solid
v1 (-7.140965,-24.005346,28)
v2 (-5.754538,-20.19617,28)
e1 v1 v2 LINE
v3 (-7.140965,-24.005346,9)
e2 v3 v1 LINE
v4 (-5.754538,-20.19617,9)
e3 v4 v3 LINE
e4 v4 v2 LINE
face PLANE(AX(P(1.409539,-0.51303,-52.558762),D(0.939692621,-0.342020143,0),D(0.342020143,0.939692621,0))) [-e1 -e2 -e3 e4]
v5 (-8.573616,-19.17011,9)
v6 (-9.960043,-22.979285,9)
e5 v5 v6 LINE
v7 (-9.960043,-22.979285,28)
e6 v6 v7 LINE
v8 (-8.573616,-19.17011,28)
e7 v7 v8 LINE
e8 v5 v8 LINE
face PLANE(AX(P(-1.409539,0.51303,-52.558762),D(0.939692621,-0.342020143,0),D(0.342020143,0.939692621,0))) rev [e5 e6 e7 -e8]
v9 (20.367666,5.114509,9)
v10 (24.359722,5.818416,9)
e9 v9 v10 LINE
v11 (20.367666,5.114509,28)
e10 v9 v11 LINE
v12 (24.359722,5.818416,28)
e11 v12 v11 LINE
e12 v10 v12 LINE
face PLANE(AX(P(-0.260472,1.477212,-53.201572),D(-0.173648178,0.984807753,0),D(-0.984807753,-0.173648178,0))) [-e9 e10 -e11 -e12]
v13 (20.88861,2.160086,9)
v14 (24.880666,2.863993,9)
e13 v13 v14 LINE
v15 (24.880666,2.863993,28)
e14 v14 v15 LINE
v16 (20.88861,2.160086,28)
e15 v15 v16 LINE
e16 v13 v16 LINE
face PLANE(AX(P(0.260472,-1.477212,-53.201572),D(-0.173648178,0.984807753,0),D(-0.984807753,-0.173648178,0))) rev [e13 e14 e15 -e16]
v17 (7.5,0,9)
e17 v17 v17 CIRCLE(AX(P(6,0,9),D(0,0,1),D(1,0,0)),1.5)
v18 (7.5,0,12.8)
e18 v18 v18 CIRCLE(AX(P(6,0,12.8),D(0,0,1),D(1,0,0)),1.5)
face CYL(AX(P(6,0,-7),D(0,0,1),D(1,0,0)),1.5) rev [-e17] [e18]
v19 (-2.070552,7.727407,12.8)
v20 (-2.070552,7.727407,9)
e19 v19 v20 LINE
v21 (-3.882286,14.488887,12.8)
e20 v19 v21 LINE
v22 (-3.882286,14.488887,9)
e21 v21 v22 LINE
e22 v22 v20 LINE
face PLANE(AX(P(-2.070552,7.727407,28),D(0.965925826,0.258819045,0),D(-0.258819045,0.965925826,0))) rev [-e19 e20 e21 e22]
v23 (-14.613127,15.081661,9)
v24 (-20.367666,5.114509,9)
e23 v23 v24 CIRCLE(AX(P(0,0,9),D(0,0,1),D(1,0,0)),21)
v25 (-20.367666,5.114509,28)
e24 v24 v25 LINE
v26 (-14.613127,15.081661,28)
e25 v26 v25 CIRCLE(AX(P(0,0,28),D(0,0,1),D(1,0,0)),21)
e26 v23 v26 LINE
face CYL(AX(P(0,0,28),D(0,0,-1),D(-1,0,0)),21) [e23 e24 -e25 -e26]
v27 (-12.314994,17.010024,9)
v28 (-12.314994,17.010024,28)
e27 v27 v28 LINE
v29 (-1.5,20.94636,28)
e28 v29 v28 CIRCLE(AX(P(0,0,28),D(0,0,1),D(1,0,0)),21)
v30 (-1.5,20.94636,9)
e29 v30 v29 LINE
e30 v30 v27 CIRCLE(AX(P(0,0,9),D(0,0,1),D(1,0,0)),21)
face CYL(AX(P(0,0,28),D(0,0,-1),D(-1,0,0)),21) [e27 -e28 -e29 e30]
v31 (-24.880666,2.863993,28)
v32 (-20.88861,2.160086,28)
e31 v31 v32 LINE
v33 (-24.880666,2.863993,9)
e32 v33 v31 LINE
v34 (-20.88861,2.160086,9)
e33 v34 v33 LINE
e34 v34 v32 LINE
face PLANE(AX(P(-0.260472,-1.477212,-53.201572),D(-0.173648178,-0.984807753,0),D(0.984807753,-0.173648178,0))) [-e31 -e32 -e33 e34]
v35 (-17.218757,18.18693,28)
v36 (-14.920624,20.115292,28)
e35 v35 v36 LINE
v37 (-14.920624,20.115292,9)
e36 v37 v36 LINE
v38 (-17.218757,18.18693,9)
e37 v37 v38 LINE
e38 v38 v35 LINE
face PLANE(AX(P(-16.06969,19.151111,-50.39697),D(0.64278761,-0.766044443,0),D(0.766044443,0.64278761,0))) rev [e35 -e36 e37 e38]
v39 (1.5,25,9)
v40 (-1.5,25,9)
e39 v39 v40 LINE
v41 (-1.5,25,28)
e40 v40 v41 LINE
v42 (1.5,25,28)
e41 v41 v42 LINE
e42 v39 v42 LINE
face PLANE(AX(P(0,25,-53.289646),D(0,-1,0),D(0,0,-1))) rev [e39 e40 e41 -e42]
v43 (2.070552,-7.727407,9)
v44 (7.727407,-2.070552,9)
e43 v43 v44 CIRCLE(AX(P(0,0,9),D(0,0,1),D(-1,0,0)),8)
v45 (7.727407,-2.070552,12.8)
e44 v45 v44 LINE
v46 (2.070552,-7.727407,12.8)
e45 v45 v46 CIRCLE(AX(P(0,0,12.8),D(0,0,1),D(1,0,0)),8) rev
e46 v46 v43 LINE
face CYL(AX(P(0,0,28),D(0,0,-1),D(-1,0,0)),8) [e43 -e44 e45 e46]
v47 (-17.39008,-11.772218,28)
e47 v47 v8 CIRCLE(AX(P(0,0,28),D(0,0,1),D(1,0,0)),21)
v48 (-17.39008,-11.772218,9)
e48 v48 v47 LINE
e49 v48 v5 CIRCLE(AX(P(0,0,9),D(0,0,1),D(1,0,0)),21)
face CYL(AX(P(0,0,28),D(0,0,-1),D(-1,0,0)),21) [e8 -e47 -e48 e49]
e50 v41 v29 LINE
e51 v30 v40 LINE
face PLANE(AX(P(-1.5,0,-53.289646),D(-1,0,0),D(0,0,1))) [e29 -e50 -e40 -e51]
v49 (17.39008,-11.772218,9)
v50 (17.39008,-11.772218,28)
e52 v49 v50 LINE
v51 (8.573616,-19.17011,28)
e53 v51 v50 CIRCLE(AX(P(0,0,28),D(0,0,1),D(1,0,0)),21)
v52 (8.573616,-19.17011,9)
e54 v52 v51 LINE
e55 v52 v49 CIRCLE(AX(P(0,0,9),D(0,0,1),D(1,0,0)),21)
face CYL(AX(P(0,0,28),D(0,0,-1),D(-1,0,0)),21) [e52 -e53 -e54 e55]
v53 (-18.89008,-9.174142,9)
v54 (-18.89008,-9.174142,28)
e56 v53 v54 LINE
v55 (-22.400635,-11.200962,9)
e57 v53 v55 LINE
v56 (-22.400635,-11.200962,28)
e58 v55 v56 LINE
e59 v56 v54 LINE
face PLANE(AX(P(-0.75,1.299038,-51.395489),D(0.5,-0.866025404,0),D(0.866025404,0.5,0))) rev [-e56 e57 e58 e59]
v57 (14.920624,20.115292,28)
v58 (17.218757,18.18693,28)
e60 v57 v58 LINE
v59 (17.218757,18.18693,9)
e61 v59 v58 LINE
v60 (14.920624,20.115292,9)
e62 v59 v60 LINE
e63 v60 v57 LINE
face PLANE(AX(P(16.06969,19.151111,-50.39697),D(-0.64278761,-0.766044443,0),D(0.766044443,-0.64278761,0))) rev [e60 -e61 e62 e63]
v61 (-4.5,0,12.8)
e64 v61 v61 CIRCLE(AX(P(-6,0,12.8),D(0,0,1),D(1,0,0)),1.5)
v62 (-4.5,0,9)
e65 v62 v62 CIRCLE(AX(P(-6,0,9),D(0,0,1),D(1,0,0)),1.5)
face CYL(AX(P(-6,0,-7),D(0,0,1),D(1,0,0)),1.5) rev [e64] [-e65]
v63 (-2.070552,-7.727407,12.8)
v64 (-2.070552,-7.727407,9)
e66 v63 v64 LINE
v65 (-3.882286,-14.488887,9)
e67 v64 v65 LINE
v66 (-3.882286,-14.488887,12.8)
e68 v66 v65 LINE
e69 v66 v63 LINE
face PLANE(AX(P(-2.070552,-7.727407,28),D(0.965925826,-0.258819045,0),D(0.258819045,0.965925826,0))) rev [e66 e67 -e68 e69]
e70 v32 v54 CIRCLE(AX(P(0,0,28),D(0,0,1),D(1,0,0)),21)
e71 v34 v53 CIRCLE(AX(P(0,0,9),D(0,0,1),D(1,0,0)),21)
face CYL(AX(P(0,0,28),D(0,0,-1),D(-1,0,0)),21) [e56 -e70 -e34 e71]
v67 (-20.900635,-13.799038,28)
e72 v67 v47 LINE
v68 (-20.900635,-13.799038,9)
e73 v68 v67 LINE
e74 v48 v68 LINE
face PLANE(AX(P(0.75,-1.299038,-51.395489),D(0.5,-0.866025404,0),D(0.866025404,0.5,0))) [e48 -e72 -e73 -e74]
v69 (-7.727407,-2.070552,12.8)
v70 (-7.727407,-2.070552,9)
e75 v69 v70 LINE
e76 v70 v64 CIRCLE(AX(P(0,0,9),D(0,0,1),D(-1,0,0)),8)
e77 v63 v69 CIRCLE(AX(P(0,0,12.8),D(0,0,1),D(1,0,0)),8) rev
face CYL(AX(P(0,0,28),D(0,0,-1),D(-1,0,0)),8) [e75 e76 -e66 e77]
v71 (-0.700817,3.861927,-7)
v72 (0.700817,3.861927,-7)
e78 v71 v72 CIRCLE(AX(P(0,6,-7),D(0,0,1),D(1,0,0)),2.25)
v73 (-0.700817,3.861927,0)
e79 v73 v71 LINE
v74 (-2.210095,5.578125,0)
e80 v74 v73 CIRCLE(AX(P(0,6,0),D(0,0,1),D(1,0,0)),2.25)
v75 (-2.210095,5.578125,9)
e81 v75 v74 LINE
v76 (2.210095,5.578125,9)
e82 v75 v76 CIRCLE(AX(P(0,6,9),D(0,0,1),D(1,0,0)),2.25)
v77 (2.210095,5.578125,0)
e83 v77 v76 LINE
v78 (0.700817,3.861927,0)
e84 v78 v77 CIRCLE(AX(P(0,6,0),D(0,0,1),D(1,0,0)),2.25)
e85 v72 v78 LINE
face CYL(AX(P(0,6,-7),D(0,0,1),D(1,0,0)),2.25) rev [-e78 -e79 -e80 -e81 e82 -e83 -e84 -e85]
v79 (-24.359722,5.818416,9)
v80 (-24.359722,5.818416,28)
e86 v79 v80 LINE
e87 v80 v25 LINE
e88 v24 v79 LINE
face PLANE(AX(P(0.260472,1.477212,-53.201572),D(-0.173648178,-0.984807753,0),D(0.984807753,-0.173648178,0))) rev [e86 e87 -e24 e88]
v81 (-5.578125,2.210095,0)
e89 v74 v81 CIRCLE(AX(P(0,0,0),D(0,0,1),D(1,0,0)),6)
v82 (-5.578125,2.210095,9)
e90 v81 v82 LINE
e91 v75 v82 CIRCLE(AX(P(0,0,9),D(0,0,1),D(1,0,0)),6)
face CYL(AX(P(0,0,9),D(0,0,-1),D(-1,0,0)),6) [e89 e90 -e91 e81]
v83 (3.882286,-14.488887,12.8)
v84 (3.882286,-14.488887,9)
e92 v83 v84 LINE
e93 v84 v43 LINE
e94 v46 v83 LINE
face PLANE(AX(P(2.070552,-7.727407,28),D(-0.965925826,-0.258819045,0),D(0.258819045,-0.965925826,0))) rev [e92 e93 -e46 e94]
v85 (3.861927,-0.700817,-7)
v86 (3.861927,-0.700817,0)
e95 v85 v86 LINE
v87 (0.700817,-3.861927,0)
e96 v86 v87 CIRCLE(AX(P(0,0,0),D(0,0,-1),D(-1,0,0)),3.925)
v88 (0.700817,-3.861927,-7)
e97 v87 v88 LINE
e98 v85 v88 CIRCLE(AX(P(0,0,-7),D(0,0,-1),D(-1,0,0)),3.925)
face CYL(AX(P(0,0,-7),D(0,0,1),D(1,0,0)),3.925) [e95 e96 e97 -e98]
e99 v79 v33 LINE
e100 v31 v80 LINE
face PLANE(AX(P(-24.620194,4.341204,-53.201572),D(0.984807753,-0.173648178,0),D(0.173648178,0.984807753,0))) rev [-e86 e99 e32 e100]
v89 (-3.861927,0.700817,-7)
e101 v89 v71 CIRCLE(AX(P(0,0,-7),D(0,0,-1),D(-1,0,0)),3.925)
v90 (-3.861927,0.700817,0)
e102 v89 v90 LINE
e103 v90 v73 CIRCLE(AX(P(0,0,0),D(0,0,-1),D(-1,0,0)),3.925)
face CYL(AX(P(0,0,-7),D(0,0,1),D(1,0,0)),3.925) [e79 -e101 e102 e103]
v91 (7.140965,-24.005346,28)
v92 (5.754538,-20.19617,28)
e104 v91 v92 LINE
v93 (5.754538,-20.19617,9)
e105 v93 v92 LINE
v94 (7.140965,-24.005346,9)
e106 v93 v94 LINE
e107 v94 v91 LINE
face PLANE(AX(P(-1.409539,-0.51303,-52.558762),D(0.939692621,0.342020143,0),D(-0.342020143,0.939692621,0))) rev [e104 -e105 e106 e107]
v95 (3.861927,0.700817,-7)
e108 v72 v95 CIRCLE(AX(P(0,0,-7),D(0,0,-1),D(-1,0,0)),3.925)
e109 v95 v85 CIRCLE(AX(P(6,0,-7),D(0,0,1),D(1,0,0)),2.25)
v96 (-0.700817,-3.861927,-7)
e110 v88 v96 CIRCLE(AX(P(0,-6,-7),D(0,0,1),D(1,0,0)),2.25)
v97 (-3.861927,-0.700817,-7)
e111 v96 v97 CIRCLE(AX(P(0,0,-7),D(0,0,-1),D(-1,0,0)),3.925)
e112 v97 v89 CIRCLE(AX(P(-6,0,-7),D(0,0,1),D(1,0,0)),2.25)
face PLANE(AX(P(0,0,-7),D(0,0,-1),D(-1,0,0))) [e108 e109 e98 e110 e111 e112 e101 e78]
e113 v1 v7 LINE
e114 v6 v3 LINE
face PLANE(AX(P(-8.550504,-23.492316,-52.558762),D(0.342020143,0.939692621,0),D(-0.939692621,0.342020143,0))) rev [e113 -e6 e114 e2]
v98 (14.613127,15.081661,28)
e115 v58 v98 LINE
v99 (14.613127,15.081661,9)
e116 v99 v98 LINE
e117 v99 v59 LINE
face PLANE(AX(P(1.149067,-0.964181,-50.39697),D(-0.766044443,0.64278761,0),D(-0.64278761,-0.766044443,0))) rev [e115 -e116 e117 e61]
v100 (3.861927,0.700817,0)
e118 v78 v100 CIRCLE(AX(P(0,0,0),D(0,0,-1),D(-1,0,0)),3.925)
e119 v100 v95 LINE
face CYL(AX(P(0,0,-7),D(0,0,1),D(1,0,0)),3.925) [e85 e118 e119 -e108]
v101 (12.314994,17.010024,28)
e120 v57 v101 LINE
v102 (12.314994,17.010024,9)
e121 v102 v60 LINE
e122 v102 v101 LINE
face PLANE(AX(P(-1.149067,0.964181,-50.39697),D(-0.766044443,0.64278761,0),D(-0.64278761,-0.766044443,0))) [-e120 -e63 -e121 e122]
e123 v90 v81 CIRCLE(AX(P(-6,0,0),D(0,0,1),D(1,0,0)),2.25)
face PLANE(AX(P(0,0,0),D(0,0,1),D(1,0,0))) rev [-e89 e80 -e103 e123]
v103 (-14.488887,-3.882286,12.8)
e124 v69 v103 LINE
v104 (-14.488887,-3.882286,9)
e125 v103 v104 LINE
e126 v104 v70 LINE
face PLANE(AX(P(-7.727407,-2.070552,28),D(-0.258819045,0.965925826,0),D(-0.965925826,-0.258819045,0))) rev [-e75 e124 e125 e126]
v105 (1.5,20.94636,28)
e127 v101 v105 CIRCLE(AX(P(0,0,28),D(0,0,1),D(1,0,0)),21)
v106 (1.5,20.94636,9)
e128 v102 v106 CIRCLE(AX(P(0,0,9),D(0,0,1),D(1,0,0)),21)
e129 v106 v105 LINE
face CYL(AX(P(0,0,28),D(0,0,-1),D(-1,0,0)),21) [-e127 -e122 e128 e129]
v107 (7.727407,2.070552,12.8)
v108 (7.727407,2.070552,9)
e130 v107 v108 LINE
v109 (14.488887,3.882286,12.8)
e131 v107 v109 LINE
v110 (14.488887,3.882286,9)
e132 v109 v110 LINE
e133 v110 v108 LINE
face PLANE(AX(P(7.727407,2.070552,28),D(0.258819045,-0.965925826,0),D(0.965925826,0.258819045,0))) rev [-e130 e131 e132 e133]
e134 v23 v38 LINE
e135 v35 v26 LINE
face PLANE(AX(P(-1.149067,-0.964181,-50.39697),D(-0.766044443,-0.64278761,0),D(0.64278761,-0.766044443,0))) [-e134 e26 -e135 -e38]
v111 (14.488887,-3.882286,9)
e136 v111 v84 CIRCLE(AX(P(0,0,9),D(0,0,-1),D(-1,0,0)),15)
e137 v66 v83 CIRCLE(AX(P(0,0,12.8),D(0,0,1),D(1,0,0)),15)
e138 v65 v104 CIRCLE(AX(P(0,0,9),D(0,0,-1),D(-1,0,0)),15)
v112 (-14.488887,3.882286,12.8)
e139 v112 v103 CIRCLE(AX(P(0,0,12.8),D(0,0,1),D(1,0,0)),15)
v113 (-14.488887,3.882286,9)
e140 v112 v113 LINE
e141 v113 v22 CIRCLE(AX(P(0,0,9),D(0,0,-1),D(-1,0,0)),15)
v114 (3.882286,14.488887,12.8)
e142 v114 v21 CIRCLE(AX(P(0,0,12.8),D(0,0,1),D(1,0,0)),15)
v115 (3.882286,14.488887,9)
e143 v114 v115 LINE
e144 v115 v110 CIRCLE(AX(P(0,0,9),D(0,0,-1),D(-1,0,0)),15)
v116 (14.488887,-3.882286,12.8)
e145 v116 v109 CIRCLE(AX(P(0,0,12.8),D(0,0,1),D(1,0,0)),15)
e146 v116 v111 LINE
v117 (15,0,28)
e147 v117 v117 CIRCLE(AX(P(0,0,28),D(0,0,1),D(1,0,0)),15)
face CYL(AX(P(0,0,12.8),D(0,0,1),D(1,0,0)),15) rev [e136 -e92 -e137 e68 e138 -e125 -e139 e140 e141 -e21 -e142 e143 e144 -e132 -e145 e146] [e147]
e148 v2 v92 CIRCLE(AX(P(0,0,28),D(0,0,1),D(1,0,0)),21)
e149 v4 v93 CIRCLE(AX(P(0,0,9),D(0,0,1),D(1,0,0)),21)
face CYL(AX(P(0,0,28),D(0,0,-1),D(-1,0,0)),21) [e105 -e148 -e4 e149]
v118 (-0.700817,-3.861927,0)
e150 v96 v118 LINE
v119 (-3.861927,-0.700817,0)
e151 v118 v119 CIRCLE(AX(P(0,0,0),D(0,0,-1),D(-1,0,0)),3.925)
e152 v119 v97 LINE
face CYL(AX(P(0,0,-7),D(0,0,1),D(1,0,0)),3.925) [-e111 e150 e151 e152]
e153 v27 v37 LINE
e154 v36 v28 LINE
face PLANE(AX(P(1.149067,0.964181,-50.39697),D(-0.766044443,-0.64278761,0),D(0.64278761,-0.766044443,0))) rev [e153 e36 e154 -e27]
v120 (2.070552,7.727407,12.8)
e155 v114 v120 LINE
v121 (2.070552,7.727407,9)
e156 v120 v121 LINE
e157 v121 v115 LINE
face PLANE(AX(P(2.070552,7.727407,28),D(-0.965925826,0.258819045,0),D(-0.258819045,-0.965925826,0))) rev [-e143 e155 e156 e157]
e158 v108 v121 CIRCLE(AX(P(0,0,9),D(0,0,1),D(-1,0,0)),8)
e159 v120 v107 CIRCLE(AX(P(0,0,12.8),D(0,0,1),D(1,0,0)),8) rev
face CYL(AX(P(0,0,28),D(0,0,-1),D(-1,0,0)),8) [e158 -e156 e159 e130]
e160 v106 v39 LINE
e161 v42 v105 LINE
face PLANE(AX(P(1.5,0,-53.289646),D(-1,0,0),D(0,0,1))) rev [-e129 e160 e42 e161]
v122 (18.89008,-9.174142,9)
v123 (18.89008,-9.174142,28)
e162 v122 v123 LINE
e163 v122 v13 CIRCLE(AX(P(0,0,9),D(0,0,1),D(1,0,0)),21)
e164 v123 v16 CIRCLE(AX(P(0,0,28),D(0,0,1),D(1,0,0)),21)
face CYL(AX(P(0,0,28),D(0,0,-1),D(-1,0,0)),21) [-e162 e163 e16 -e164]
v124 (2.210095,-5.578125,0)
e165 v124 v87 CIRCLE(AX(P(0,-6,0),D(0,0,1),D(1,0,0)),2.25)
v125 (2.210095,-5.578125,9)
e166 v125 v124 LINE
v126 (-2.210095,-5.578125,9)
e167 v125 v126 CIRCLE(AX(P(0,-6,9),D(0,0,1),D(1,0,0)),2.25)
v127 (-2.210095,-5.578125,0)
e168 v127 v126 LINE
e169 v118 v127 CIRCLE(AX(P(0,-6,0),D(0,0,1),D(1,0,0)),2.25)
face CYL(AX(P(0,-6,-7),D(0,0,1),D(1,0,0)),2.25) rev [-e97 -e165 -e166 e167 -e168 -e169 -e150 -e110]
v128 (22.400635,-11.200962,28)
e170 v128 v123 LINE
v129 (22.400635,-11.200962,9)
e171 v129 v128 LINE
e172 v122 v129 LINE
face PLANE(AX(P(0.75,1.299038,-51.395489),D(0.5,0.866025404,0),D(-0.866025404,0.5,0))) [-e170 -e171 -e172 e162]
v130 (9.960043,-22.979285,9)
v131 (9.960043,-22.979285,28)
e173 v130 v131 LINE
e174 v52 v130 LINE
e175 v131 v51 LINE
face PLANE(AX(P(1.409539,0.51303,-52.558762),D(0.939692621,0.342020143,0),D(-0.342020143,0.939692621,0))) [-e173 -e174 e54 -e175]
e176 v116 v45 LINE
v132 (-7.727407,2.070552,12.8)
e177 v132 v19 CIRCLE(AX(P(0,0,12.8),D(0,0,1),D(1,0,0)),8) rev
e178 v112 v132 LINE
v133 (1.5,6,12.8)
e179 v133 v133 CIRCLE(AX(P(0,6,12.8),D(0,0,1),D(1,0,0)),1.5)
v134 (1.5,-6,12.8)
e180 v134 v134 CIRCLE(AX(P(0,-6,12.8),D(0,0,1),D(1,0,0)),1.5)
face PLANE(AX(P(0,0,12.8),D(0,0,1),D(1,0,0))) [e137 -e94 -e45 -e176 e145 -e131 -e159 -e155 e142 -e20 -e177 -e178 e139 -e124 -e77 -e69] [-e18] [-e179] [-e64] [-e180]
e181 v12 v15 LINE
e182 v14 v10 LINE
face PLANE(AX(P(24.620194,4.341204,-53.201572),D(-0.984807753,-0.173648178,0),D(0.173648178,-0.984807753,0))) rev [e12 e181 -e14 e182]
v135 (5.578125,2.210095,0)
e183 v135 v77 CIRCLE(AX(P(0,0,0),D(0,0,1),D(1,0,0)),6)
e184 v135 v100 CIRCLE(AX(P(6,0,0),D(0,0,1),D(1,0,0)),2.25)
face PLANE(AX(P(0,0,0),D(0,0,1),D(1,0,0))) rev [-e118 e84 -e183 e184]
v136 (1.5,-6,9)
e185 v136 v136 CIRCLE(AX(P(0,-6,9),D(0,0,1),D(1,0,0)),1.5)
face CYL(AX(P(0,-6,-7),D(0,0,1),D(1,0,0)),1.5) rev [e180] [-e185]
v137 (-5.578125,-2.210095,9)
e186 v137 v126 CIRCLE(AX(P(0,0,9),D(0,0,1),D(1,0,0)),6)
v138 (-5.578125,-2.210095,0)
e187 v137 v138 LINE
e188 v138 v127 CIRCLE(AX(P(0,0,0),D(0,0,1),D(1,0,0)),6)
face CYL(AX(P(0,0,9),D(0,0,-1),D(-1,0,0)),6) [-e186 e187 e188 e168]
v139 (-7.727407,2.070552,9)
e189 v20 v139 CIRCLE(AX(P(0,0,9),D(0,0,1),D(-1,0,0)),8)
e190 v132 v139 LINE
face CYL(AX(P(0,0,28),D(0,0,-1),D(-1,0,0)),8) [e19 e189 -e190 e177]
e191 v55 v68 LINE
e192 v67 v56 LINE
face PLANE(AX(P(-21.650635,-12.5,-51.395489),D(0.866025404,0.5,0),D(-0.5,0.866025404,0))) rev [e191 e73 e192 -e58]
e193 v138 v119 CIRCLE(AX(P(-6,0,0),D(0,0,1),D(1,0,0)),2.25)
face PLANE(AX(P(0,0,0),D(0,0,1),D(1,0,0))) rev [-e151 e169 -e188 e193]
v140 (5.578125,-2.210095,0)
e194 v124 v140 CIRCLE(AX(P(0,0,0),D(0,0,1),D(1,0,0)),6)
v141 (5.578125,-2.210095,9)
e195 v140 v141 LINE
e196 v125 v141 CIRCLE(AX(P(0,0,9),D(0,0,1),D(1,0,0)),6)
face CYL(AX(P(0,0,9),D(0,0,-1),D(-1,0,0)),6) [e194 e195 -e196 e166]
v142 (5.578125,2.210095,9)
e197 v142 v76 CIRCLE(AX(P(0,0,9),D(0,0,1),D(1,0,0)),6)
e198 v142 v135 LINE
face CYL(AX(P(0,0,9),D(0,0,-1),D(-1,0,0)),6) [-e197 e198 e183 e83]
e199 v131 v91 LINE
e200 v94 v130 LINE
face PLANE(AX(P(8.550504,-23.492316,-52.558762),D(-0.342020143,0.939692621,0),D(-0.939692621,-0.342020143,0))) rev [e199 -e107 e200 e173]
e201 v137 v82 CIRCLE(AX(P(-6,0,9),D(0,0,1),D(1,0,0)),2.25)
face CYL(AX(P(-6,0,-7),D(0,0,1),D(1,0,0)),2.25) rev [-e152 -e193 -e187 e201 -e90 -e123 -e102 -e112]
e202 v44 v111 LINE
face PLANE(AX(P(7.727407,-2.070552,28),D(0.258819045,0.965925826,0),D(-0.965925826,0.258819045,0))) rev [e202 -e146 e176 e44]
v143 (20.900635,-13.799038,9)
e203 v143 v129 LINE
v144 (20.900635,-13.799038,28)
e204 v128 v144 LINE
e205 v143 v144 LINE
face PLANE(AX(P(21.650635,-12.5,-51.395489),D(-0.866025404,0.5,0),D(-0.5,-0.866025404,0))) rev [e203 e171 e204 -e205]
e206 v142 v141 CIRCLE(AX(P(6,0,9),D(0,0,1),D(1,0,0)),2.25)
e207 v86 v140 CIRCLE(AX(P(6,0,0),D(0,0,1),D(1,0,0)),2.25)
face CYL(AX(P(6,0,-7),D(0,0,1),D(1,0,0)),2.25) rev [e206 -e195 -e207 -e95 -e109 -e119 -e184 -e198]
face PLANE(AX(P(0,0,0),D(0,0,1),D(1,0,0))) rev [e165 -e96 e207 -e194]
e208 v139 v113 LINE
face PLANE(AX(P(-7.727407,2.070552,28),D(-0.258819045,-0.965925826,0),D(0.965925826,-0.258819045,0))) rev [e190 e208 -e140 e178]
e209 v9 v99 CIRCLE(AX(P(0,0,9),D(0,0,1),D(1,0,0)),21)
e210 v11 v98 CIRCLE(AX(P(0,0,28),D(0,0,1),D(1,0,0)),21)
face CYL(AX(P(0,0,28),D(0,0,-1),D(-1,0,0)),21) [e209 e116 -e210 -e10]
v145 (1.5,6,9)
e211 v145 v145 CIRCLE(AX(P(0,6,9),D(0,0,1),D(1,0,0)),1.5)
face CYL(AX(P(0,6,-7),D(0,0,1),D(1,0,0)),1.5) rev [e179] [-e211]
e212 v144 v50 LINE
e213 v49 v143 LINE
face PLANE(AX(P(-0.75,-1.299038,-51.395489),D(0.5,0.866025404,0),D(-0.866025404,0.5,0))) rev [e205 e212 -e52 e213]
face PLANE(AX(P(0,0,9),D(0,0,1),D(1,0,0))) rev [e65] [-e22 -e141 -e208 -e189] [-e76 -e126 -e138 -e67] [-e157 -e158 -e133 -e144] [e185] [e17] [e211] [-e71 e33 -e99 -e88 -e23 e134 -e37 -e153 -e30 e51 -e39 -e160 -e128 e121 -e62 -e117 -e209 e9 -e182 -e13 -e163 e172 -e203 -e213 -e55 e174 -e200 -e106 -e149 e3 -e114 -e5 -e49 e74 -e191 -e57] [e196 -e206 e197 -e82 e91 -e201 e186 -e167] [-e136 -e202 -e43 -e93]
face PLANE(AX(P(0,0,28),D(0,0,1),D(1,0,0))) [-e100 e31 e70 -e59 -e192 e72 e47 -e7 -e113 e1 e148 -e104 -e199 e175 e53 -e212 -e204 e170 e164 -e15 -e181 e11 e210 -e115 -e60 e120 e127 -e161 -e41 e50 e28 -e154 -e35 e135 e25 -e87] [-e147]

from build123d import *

# Parameters (mm, degrees)
SKIZZE1_R                       = 6
AUFSATZ_LINEAR_AUSTRAGEN1_DEPTH = 9
SKIZZE2_R                       = 3.925
AUFSATZ_LINEAR_AUSTRAGEN2_DEPTH = 7
SKIZZE3_R                       = 21
AUFSATZ_LINEAR_AUSTRAGEN3_DEPTH = 19
SKIZZE4_R                       = 15
SCHNITT_LINEAR_AUSTRAGEN2_DEPTH = 15.2
AUFSATZ_LINEAR_START            = -19
AUFSATZ_LINEAR_AUSTRAGEN4_DEPTH = 19
KREISMUSTER1_COUNT              = 9
SKETCH1_R                       = 1.5
CUT_EXTRUDE1_DEPTH              = 41.448579025
CUT_EXTRUDE2_START              = -3.8
SKETCH2_R                       = 2.25
CUT_EXTRUDE2_DEPTH              = 37.648579025
CUT_EXTRUDE3_START              = -3.8
CUT_EXTRUDE3_DEPTH              = 3.8


# Read off the part's stored shape, not the designer's step: Cut-Extrude3
with BuildPart() as part:
    # Skizze1 → Aufsatz-Linear austragen1 (new body)
    with BuildSketch(Plane.XY):
        Circle(SKIZZE1_R)
    extrude(amount=AUFSATZ_LINEAR_AUSTRAGEN1_DEPTH)

    # Skizze2 → Aufsatz-Linear austragen2 (add)
    with BuildSketch(Plane(origin=(0, 0, 0), x_dir=(-1, 0, 0), z_dir=(0, 0, -1))):
        Circle(SKIZZE2_R)
    extrude(amount=AUFSATZ_LINEAR_AUSTRAGEN2_DEPTH)

    # Skizze3 → Aufsatz-Linear austragen3 (add)
    with BuildSketch(Plane.XY.offset(9)):
        Circle(SKIZZE3_R)
    extrude(amount=AUFSATZ_LINEAR_AUSTRAGEN3_DEPTH)

    # Skizze4 → Schnitt-Linear austragen2 (cut)
    with BuildSketch(Plane.XY.offset(28)):
        Circle(SKIZZE4_R)
    extrude(amount=-SCHNITT_LINEAR_AUSTRAGEN2_DEPTH, mode=Mode.SUBTRACT)

    # Skizze6 → Aufsatz-Linear austragen4 (add)
    with BuildSketch(Plane.XY.offset(28).offset(AUFSATZ_LINEAR_START)):
        with BuildLine():
            Line((1.5, 25), (-1.5, 25))
            Line((-1.5, 25), (-1.5, 20.946360066))
            ThreePointArc((-1.5, 20.946360066), (0, 21), (1.5, 20.946360066))
            Line((1.5, 20.946360066), (1.5, 25))
        make_face()
    aufsatz_linear_austragen4 = extrude(amount=AUFSATZ_LINEAR_AUSTRAGEN4_DEPTH)

    # Kreismuster1: Aufsatz-Linear austragen4 ×9 about axis
    kreismuster1_axis = Axis((0, 0, 0), (0, 0, 1))
    for i in range(1, KREISMUSTER1_COUNT):
        add(aufsatz_linear_austragen4.rotate(kreismuster1_axis, i * 360 / KREISMUSTER1_COUNT))

    # Sketch1 → Cut-Extrude1 (cut, through all)
    with BuildSketch(Plane.XY.offset(12.8)):
        with Locations((-6, 0)):
            Circle(SKETCH1_R)
        with Locations((0, 6)):
            Circle(SKETCH1_R)
        with Locations((6, 0)):
            Circle(SKETCH1_R)
        with Locations((0, -6)):
            Circle(SKETCH1_R)
    extrude(amount=-CUT_EXTRUDE1_DEPTH, mode=Mode.SUBTRACT)

    # Sketch2 → Cut-Extrude2 (cut, through all)
    with BuildSketch(Plane.XY.offset(12.8).offset(CUT_EXTRUDE2_START)):
        with Locations((0, 6)):
            Circle(SKETCH2_R)
        with Locations((6, 0)):
            Circle(SKETCH2_R)
        with Locations((0, -6)):
            Circle(SKETCH2_R)
        with Locations((-6, 0)):
            Circle(SKETCH2_R)
    extrude(amount=-CUT_EXTRUDE2_DEPTH, mode=Mode.SUBTRACT)

    # Cut-Extrude3 outline → Cut-Extrude3 (cut)
    with BuildSketch(Plane(origin=(0, 0, 9), x_dir=(-1, 0, 0), z_dir=(0, 0, -1)).offset(CUT_EXTRUDE3_START)):
        with BuildLine():
            Line((7.72740661, 2.070552361), (14.488887394, 3.882285677))
            ThreePointArc((14.488887394, 3.882285677), (10.606601718, 10.606601718), (3.882285677, 14.488887394))
            Line((3.882285677, 14.488887394), (2.070552361, 7.72740661))
            ThreePointArc((2.070552361, 7.72740661), (5.656854249, 5.656854249), (7.72740661, 2.070552361))
        make_face()
        with BuildLine():
            ThreePointArc((3.882285677, -14.488887394), (10.606601718, -10.606601718), (14.488887394, -3.882285677))
            Line((14.488887394, -3.882285677), (7.72740661, -2.070552361))
            ThreePointArc((7.72740661, -2.070552361), (5.656854249, -5.656854249), (2.070552361, -7.72740661))
            Line((2.070552361, -7.72740661), (3.882285677, -14.488887394))
        make_face()
        with BuildLine():
            Line((-2.070552361, 7.72740661), (-3.882285677, 14.488887394))
            ThreePointArc((-3.882285677, 14.488887394), (-10.606601718, 10.606601718), (-14.488887394, 3.882285677))
            Line((-14.488887394, 3.882285677), (-7.72740661, 2.070552361))
            ThreePointArc((-7.72740661, 2.070552361), (-5.656854249, 5.656854249), (-2.070552361, 7.72740661))
        make_face()
        with BuildLine():
            ThreePointArc((-14.488887394, -3.882285677), (-10.606601718, -10.606601718), (-3.882285677, -14.488887394))
            Line((-3.882285677, -14.488887394), (-2.070552361, -7.72740661))
            ThreePointArc((-2.070552361, -7.72740661), (-5.656854249, -5.656854249), (-7.72740661, -2.070552361))
            Line((-7.72740661, -2.070552361), (-14.488887394, -3.882285677))
        make_face()
    extrude(amount=CUT_EXTRUDE3_DEPTH, mode=Mode.SUBTRACT)


solid = part.part
